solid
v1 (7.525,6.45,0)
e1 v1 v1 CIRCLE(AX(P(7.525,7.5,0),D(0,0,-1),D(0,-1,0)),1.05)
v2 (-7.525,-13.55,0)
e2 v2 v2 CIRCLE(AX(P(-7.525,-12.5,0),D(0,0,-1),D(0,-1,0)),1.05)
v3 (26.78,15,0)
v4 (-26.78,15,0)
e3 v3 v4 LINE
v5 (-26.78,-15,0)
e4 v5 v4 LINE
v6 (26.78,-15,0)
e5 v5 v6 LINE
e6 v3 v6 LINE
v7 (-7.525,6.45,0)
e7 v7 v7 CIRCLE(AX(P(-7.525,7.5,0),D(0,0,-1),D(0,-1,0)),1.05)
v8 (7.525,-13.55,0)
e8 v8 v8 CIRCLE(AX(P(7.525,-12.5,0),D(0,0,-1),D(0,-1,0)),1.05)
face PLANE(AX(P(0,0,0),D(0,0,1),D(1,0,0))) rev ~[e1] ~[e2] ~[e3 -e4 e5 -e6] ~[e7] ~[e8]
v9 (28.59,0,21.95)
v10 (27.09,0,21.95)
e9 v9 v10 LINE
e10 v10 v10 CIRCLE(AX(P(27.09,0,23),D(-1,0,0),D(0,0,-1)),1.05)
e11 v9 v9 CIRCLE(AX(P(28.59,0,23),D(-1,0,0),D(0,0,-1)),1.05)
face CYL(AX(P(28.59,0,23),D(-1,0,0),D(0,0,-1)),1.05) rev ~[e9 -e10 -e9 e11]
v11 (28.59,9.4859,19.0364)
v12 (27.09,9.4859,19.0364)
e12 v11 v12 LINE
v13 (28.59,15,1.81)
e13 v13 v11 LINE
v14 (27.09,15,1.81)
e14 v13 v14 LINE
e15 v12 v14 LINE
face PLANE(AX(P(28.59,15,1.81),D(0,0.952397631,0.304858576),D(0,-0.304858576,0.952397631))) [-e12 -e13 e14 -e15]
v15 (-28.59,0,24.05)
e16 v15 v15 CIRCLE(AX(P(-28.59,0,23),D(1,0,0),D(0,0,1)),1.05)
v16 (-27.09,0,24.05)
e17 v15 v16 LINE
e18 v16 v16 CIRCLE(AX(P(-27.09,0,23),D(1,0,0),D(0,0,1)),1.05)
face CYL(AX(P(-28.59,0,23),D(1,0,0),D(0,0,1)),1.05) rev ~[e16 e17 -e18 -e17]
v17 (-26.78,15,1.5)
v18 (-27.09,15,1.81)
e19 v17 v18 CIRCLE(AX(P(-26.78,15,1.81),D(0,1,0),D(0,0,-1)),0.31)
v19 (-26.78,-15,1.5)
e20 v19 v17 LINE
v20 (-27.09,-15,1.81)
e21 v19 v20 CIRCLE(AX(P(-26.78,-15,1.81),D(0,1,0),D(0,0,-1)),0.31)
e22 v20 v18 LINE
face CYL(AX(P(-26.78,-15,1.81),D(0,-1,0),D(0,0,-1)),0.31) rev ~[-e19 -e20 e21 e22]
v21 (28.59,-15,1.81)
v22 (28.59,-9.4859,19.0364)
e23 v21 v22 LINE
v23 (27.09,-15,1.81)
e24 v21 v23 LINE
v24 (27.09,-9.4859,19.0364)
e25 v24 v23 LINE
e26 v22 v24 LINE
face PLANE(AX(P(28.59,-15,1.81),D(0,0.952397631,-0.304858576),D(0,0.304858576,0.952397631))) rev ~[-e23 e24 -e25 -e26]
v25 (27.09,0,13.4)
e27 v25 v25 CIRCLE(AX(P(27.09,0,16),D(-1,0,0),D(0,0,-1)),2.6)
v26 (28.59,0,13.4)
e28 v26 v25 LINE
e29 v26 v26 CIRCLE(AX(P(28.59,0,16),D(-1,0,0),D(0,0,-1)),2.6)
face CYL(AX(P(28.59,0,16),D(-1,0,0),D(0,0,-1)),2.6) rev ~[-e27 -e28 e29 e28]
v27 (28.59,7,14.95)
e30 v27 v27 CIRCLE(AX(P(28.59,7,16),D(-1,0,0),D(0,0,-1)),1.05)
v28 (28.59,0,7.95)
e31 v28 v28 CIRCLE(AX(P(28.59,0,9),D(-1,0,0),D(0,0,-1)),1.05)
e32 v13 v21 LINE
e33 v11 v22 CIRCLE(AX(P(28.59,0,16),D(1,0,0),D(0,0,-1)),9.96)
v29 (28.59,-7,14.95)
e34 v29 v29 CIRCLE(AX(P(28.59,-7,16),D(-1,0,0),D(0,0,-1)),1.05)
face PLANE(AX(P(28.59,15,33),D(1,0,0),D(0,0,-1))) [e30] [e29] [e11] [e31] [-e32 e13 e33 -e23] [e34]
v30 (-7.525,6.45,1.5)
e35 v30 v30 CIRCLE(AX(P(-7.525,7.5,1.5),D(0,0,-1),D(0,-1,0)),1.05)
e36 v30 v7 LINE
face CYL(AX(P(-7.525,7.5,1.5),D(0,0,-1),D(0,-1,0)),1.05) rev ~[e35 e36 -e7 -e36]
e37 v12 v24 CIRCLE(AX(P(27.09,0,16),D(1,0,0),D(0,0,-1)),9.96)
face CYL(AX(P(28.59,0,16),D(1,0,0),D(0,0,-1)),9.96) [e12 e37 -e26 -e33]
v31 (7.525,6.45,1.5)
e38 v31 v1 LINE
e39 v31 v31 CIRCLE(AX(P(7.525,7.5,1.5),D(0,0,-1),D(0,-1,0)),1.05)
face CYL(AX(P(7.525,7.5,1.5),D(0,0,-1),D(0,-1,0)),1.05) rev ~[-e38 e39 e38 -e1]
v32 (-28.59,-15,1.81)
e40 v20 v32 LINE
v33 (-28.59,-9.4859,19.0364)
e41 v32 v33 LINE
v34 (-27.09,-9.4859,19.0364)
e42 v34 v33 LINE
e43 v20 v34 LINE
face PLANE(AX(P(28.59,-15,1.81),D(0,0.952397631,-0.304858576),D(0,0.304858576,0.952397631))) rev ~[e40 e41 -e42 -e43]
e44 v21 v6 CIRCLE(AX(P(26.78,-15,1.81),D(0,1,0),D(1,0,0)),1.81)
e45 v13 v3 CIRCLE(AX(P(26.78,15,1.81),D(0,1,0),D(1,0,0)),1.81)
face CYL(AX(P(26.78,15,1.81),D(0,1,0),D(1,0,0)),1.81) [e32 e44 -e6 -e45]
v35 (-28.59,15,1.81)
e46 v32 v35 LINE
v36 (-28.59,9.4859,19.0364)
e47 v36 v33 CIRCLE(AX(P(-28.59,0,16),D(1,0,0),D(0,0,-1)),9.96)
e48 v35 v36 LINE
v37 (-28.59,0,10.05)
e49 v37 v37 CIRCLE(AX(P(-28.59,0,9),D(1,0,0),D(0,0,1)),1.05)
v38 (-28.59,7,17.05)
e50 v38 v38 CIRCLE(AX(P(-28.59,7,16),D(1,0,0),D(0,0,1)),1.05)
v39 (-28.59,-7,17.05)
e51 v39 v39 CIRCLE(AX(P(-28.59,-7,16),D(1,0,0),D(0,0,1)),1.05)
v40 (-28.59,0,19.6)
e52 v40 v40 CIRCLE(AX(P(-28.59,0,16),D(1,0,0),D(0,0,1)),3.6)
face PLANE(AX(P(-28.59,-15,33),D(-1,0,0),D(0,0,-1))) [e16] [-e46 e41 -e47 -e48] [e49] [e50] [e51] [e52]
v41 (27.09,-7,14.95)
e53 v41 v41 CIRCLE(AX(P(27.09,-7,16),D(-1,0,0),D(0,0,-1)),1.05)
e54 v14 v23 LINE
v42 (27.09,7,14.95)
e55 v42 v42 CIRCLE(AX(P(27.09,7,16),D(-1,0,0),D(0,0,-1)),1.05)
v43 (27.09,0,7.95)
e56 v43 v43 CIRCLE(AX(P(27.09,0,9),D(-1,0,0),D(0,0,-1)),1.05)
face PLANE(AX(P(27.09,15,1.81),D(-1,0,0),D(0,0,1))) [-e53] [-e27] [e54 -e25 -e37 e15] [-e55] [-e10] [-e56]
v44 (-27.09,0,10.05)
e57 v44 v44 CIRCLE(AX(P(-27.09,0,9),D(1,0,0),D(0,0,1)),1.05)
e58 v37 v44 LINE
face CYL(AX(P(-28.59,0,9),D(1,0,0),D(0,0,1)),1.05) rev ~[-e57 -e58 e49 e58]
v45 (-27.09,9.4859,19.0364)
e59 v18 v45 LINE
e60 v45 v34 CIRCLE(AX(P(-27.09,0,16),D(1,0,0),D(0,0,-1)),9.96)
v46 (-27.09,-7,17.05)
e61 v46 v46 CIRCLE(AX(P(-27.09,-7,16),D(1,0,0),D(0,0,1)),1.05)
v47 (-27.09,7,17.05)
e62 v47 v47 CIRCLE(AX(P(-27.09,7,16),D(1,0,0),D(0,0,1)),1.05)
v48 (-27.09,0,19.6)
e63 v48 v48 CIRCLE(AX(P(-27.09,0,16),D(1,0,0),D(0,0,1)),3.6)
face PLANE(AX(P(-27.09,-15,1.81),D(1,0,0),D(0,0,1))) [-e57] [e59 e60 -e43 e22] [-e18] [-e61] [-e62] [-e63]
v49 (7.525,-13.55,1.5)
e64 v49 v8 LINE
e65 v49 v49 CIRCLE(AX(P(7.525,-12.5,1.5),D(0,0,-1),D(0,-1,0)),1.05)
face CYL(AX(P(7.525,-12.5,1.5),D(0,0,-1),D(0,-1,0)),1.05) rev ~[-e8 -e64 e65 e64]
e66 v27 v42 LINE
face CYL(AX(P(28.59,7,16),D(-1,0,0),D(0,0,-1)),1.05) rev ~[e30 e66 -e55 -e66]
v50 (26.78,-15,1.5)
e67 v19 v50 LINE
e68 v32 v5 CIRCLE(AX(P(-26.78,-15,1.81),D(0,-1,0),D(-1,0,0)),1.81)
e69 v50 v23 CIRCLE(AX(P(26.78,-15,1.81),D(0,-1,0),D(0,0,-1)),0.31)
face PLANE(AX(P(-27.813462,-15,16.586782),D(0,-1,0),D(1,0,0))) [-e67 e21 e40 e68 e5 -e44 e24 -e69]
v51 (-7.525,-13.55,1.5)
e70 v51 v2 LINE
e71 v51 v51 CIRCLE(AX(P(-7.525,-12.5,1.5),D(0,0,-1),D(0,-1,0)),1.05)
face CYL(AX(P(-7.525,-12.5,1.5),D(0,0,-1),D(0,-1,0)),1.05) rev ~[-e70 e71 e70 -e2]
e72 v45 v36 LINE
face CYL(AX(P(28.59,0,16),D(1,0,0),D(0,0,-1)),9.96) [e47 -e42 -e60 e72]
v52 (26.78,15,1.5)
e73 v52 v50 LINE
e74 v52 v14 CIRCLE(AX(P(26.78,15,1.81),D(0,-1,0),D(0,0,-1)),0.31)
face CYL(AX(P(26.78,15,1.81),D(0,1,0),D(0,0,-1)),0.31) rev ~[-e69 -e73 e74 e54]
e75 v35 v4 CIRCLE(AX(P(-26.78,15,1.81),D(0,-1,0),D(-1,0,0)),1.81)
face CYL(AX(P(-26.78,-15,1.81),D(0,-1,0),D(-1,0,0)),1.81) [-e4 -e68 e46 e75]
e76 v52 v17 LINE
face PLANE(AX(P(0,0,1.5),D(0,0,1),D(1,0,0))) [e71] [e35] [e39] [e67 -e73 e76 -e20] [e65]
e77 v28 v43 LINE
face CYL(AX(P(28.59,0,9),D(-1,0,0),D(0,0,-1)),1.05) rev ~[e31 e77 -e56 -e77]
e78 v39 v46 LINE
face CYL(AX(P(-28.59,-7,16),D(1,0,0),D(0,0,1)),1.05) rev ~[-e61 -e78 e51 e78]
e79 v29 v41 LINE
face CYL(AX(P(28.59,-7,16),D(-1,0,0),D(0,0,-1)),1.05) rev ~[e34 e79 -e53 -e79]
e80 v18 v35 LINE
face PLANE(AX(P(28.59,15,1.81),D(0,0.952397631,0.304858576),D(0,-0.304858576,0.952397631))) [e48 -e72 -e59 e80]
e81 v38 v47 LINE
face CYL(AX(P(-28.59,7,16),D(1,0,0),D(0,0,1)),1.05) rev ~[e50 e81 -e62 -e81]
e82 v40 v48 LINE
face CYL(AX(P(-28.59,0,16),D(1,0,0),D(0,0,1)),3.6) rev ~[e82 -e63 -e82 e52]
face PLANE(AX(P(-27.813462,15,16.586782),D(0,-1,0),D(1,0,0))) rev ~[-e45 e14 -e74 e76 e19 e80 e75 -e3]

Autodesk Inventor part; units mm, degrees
ref_plane "YZ Plane" through (0, 0, 0) normal (1, 0, 0) x (0, 1, 0)
ref_plane "XZ Plane" through (0, 0, 0) normal (0, 1, 0) x (-1, 0, 0)
ref_plane "XY Plane" through (0, 0, 0) normal (0, 0, 1) x (1, 0, 0)
sketch "Sketch1" plane through (0, 0, 0) normal (0, 0, 1) x (1, 0, 0)
  line L0 (-28.59, -15) -> (28.59, -15)
  line L1 (28.59, -15) -> (28.59, 15)
  line L2 (28.59, 15) -> (-28.59, 15)
  line L3 (-28.59, 15) -> (-28.59, -15)
  line L4 (-28.59, -15) -> (28.59, 15) construction
  line L5 (28.59, -15) -> (-28.59, 15) construction
  point P0 (0, 0)
  dimension "d0" = 57.18
  dimension "d1" = 30
extrude "Plate1" add sketch "Sketch1" along normal blind 1.5
sketch "Sketch2" plane through (-27.09, -15, 0) normal (-1, 0, 0) x (0, -1, 0)
  line L0 (-30, 0) -> (0, 0)
  line L1 (0, 0) -> (0, 33)
  line L2 (0, 33) -> (-30, 33)
  line L3 (-30, 33) -> (-30, 0)
edge flange "Flange1" height 33 angle 90 thickness 1.5 bend radius 0.31 thickness toward (-1, 0, 0) relief tear relief width 1.5 relief depth 0.75 corner gap 0.31 corner form 0 edges at (-28.59, 0, 1.5) (28.59, 0, 1.5) wall of the first edge with corners at (-27.09, 15, 0) (-27.09, -15, 0) (-27.09, -15, 33) (-27.09, 15, 33)
bend "Bend1"
corner "Corner1"
sketch "Sketch3" plane through (28.59, -15, 33) normal (1, 0, 0) x (0, 0, -1)
  circle A0 centre (17, 15) radius 9.96
  line L0 (0, 30) -> (31.19, 30) projected
  line L1 (31.19, 0) -> (0, 0) projected
  line L2 (31.19, 30) -> (13.9636, 24.4859)
  line L3 (31.19, 0) -> (13.9636, 5.5141)
  line L4 (0, 30) -> (0, 0)
  point P0 (33, 15)
  dimension "d13" = 19.92
  dimension "d14" = 0
  dimension "d15" = 16
extrude "Cut1" cut sketch "Sketch3" against normal blind 57.18 contours A0 L3 L1 L4 L0 L2
sketch "Sketch17" plane through (28.59, -15, 1.81) normal (1, 0, 0) x (0, 0, -1)
  circle A0 centre (-21.19, 15) radius 0.7835 projected
  circle A1 centre (-14.19, 22) radius 0.7835 projected
  circle A2 centre (-7.19, 15) radius 0.7835 projected
  circle A3 centre (-14.19, 8) radius 0.7835 projected
  point P0 (1.81, 15)
hole "Hole7" at (28.59, 0, 23) at (28.59, 7, 16) at (28.59, 0, 9) at (28.59, -7, 16) direction (-1, 0, 0) diameter 2.1 depth 1.5
sketch "Sketch18" plane through (-28.59, -15, 1.81) normal (-1, 0, 0) x (0, 0, 1)
  circle A0 centre (14.19, 22) radius 0.7835 projected
  circle A1 centre (21.19, 15) radius 0.7835 projected
  circle A2 centre (14.19, 8) radius 0.7835 projected
  circle A3 centre (7.19, 15) radius 0.7835 projected
  point P0 (-1.81, 15)
hole "Hole8" at (-28.59, 7, 16) at (-28.59, 0, 23) at (-28.59, -7, 16) at (-28.59, 0, 9) direction (1, 0, 0) diameter 2.1 depth 1.5
sketch "Sketch19" plane through (0, 0, 1.5) normal (0, 0, 1) x (1, 0, 0)
  point P0 (0, 0)
sketch "Sketch21" plane through (-28.59, -15, 1.81) normal (-1, 0, 0) x (0, 0, 1)
  point P0 (-1.81, 15)
sketch "Sketch22" plane through (-28.59, -15, 1.81) normal (-1, 0, 0) x (0, 0, 1)
  circle A0 centre (14.19, 15) radius 1.75 projected
  point P0 (-1.81, 15)
sketch "Sketch23" plane through (-28.59, -15, 1.81) normal (-1, 0, 0) x (0, 0, 1)
  point P0 (-1.81, 15)
hole "Hole10" at (-28.59, 0, 16) direction (1, 0, 0) diameter 7.2 depth 1.5
sketch "Sketch24" plane through (28.59, -15, 1.81) normal (1, 0, 0) x (0, 0, -1)
  circle A0 centre (-14.19, 15) radius 1.2295 projected
  point P0 (1.81, 15)
hole "Hole11" at (28.59, 0, 16) direction (-1, 0, 0) diameter 5.2 depth 1.5
sketch "Sketch25" plane through (0, 0, 1.5) normal (0, 0, 1) x (1, 0, 0)
  circle A0 centre (7.525, 7.5) radius 0.7835
  circle A1 centre (7.525, -12.5) radius 0.7835
  circle A2 centre (-7.525, -12.5) radius 0.7835
  circle A3 centre (-7.525, 7.5) radius 0.7835
  point P0 (0, 0)
hole "Hole12" at (7.525, 7.5, 1.5) at (7.525, -12.5, 1.5) at (-7.525, 7.5, 1.5) at (-7.525, -12.5, 1.5) direction (0, 0, -1) diameter 2.1 depth 1.5
equation "\"d90\" = Thickness"
equation "\"d97\" = Thickness"
equation "\"d111\" = Thickness"
equation "\"d118\" = Thickness"
equation "\"d125\" = Thickness"
equation "\"d2\" = Thickness"
equation "\"d3\" = BendReliefWidth"
equation "\"d4\" = BendReliefDepth"
equation "\"d5\" = MinimumRemnant"
equation "\"d6\" = TransitionRadius"
equation "\"d9\" = BendRadius"
equation "\"d10\" = CornerReliefSize"
equation "\"d11\" = GapSize"
equation "\"d12\" = JacobiRadiusSize"
equation "\"BendReliefWidth\" = Thickness"
equation "\"BendReliefDepth\" = 0.5 * Thickness"
equation "\"CornerReliefSize\" = 4 * Thickness"
equation "\"MinimumRemnant\" = 2 * Thickness"
equation "\"TransitionRadius\" = BendRadius"
equation "\"JacobiRadiusSize\" = BendRadius"
equation "\"GapSize\" = Thickness"
equation "\"Thickness\" = 1.5"
equation "\"BendRadius\" = 0.31"
properties part number "axis_20_bottom_frame" material "Aluminum 6061-AHC"
